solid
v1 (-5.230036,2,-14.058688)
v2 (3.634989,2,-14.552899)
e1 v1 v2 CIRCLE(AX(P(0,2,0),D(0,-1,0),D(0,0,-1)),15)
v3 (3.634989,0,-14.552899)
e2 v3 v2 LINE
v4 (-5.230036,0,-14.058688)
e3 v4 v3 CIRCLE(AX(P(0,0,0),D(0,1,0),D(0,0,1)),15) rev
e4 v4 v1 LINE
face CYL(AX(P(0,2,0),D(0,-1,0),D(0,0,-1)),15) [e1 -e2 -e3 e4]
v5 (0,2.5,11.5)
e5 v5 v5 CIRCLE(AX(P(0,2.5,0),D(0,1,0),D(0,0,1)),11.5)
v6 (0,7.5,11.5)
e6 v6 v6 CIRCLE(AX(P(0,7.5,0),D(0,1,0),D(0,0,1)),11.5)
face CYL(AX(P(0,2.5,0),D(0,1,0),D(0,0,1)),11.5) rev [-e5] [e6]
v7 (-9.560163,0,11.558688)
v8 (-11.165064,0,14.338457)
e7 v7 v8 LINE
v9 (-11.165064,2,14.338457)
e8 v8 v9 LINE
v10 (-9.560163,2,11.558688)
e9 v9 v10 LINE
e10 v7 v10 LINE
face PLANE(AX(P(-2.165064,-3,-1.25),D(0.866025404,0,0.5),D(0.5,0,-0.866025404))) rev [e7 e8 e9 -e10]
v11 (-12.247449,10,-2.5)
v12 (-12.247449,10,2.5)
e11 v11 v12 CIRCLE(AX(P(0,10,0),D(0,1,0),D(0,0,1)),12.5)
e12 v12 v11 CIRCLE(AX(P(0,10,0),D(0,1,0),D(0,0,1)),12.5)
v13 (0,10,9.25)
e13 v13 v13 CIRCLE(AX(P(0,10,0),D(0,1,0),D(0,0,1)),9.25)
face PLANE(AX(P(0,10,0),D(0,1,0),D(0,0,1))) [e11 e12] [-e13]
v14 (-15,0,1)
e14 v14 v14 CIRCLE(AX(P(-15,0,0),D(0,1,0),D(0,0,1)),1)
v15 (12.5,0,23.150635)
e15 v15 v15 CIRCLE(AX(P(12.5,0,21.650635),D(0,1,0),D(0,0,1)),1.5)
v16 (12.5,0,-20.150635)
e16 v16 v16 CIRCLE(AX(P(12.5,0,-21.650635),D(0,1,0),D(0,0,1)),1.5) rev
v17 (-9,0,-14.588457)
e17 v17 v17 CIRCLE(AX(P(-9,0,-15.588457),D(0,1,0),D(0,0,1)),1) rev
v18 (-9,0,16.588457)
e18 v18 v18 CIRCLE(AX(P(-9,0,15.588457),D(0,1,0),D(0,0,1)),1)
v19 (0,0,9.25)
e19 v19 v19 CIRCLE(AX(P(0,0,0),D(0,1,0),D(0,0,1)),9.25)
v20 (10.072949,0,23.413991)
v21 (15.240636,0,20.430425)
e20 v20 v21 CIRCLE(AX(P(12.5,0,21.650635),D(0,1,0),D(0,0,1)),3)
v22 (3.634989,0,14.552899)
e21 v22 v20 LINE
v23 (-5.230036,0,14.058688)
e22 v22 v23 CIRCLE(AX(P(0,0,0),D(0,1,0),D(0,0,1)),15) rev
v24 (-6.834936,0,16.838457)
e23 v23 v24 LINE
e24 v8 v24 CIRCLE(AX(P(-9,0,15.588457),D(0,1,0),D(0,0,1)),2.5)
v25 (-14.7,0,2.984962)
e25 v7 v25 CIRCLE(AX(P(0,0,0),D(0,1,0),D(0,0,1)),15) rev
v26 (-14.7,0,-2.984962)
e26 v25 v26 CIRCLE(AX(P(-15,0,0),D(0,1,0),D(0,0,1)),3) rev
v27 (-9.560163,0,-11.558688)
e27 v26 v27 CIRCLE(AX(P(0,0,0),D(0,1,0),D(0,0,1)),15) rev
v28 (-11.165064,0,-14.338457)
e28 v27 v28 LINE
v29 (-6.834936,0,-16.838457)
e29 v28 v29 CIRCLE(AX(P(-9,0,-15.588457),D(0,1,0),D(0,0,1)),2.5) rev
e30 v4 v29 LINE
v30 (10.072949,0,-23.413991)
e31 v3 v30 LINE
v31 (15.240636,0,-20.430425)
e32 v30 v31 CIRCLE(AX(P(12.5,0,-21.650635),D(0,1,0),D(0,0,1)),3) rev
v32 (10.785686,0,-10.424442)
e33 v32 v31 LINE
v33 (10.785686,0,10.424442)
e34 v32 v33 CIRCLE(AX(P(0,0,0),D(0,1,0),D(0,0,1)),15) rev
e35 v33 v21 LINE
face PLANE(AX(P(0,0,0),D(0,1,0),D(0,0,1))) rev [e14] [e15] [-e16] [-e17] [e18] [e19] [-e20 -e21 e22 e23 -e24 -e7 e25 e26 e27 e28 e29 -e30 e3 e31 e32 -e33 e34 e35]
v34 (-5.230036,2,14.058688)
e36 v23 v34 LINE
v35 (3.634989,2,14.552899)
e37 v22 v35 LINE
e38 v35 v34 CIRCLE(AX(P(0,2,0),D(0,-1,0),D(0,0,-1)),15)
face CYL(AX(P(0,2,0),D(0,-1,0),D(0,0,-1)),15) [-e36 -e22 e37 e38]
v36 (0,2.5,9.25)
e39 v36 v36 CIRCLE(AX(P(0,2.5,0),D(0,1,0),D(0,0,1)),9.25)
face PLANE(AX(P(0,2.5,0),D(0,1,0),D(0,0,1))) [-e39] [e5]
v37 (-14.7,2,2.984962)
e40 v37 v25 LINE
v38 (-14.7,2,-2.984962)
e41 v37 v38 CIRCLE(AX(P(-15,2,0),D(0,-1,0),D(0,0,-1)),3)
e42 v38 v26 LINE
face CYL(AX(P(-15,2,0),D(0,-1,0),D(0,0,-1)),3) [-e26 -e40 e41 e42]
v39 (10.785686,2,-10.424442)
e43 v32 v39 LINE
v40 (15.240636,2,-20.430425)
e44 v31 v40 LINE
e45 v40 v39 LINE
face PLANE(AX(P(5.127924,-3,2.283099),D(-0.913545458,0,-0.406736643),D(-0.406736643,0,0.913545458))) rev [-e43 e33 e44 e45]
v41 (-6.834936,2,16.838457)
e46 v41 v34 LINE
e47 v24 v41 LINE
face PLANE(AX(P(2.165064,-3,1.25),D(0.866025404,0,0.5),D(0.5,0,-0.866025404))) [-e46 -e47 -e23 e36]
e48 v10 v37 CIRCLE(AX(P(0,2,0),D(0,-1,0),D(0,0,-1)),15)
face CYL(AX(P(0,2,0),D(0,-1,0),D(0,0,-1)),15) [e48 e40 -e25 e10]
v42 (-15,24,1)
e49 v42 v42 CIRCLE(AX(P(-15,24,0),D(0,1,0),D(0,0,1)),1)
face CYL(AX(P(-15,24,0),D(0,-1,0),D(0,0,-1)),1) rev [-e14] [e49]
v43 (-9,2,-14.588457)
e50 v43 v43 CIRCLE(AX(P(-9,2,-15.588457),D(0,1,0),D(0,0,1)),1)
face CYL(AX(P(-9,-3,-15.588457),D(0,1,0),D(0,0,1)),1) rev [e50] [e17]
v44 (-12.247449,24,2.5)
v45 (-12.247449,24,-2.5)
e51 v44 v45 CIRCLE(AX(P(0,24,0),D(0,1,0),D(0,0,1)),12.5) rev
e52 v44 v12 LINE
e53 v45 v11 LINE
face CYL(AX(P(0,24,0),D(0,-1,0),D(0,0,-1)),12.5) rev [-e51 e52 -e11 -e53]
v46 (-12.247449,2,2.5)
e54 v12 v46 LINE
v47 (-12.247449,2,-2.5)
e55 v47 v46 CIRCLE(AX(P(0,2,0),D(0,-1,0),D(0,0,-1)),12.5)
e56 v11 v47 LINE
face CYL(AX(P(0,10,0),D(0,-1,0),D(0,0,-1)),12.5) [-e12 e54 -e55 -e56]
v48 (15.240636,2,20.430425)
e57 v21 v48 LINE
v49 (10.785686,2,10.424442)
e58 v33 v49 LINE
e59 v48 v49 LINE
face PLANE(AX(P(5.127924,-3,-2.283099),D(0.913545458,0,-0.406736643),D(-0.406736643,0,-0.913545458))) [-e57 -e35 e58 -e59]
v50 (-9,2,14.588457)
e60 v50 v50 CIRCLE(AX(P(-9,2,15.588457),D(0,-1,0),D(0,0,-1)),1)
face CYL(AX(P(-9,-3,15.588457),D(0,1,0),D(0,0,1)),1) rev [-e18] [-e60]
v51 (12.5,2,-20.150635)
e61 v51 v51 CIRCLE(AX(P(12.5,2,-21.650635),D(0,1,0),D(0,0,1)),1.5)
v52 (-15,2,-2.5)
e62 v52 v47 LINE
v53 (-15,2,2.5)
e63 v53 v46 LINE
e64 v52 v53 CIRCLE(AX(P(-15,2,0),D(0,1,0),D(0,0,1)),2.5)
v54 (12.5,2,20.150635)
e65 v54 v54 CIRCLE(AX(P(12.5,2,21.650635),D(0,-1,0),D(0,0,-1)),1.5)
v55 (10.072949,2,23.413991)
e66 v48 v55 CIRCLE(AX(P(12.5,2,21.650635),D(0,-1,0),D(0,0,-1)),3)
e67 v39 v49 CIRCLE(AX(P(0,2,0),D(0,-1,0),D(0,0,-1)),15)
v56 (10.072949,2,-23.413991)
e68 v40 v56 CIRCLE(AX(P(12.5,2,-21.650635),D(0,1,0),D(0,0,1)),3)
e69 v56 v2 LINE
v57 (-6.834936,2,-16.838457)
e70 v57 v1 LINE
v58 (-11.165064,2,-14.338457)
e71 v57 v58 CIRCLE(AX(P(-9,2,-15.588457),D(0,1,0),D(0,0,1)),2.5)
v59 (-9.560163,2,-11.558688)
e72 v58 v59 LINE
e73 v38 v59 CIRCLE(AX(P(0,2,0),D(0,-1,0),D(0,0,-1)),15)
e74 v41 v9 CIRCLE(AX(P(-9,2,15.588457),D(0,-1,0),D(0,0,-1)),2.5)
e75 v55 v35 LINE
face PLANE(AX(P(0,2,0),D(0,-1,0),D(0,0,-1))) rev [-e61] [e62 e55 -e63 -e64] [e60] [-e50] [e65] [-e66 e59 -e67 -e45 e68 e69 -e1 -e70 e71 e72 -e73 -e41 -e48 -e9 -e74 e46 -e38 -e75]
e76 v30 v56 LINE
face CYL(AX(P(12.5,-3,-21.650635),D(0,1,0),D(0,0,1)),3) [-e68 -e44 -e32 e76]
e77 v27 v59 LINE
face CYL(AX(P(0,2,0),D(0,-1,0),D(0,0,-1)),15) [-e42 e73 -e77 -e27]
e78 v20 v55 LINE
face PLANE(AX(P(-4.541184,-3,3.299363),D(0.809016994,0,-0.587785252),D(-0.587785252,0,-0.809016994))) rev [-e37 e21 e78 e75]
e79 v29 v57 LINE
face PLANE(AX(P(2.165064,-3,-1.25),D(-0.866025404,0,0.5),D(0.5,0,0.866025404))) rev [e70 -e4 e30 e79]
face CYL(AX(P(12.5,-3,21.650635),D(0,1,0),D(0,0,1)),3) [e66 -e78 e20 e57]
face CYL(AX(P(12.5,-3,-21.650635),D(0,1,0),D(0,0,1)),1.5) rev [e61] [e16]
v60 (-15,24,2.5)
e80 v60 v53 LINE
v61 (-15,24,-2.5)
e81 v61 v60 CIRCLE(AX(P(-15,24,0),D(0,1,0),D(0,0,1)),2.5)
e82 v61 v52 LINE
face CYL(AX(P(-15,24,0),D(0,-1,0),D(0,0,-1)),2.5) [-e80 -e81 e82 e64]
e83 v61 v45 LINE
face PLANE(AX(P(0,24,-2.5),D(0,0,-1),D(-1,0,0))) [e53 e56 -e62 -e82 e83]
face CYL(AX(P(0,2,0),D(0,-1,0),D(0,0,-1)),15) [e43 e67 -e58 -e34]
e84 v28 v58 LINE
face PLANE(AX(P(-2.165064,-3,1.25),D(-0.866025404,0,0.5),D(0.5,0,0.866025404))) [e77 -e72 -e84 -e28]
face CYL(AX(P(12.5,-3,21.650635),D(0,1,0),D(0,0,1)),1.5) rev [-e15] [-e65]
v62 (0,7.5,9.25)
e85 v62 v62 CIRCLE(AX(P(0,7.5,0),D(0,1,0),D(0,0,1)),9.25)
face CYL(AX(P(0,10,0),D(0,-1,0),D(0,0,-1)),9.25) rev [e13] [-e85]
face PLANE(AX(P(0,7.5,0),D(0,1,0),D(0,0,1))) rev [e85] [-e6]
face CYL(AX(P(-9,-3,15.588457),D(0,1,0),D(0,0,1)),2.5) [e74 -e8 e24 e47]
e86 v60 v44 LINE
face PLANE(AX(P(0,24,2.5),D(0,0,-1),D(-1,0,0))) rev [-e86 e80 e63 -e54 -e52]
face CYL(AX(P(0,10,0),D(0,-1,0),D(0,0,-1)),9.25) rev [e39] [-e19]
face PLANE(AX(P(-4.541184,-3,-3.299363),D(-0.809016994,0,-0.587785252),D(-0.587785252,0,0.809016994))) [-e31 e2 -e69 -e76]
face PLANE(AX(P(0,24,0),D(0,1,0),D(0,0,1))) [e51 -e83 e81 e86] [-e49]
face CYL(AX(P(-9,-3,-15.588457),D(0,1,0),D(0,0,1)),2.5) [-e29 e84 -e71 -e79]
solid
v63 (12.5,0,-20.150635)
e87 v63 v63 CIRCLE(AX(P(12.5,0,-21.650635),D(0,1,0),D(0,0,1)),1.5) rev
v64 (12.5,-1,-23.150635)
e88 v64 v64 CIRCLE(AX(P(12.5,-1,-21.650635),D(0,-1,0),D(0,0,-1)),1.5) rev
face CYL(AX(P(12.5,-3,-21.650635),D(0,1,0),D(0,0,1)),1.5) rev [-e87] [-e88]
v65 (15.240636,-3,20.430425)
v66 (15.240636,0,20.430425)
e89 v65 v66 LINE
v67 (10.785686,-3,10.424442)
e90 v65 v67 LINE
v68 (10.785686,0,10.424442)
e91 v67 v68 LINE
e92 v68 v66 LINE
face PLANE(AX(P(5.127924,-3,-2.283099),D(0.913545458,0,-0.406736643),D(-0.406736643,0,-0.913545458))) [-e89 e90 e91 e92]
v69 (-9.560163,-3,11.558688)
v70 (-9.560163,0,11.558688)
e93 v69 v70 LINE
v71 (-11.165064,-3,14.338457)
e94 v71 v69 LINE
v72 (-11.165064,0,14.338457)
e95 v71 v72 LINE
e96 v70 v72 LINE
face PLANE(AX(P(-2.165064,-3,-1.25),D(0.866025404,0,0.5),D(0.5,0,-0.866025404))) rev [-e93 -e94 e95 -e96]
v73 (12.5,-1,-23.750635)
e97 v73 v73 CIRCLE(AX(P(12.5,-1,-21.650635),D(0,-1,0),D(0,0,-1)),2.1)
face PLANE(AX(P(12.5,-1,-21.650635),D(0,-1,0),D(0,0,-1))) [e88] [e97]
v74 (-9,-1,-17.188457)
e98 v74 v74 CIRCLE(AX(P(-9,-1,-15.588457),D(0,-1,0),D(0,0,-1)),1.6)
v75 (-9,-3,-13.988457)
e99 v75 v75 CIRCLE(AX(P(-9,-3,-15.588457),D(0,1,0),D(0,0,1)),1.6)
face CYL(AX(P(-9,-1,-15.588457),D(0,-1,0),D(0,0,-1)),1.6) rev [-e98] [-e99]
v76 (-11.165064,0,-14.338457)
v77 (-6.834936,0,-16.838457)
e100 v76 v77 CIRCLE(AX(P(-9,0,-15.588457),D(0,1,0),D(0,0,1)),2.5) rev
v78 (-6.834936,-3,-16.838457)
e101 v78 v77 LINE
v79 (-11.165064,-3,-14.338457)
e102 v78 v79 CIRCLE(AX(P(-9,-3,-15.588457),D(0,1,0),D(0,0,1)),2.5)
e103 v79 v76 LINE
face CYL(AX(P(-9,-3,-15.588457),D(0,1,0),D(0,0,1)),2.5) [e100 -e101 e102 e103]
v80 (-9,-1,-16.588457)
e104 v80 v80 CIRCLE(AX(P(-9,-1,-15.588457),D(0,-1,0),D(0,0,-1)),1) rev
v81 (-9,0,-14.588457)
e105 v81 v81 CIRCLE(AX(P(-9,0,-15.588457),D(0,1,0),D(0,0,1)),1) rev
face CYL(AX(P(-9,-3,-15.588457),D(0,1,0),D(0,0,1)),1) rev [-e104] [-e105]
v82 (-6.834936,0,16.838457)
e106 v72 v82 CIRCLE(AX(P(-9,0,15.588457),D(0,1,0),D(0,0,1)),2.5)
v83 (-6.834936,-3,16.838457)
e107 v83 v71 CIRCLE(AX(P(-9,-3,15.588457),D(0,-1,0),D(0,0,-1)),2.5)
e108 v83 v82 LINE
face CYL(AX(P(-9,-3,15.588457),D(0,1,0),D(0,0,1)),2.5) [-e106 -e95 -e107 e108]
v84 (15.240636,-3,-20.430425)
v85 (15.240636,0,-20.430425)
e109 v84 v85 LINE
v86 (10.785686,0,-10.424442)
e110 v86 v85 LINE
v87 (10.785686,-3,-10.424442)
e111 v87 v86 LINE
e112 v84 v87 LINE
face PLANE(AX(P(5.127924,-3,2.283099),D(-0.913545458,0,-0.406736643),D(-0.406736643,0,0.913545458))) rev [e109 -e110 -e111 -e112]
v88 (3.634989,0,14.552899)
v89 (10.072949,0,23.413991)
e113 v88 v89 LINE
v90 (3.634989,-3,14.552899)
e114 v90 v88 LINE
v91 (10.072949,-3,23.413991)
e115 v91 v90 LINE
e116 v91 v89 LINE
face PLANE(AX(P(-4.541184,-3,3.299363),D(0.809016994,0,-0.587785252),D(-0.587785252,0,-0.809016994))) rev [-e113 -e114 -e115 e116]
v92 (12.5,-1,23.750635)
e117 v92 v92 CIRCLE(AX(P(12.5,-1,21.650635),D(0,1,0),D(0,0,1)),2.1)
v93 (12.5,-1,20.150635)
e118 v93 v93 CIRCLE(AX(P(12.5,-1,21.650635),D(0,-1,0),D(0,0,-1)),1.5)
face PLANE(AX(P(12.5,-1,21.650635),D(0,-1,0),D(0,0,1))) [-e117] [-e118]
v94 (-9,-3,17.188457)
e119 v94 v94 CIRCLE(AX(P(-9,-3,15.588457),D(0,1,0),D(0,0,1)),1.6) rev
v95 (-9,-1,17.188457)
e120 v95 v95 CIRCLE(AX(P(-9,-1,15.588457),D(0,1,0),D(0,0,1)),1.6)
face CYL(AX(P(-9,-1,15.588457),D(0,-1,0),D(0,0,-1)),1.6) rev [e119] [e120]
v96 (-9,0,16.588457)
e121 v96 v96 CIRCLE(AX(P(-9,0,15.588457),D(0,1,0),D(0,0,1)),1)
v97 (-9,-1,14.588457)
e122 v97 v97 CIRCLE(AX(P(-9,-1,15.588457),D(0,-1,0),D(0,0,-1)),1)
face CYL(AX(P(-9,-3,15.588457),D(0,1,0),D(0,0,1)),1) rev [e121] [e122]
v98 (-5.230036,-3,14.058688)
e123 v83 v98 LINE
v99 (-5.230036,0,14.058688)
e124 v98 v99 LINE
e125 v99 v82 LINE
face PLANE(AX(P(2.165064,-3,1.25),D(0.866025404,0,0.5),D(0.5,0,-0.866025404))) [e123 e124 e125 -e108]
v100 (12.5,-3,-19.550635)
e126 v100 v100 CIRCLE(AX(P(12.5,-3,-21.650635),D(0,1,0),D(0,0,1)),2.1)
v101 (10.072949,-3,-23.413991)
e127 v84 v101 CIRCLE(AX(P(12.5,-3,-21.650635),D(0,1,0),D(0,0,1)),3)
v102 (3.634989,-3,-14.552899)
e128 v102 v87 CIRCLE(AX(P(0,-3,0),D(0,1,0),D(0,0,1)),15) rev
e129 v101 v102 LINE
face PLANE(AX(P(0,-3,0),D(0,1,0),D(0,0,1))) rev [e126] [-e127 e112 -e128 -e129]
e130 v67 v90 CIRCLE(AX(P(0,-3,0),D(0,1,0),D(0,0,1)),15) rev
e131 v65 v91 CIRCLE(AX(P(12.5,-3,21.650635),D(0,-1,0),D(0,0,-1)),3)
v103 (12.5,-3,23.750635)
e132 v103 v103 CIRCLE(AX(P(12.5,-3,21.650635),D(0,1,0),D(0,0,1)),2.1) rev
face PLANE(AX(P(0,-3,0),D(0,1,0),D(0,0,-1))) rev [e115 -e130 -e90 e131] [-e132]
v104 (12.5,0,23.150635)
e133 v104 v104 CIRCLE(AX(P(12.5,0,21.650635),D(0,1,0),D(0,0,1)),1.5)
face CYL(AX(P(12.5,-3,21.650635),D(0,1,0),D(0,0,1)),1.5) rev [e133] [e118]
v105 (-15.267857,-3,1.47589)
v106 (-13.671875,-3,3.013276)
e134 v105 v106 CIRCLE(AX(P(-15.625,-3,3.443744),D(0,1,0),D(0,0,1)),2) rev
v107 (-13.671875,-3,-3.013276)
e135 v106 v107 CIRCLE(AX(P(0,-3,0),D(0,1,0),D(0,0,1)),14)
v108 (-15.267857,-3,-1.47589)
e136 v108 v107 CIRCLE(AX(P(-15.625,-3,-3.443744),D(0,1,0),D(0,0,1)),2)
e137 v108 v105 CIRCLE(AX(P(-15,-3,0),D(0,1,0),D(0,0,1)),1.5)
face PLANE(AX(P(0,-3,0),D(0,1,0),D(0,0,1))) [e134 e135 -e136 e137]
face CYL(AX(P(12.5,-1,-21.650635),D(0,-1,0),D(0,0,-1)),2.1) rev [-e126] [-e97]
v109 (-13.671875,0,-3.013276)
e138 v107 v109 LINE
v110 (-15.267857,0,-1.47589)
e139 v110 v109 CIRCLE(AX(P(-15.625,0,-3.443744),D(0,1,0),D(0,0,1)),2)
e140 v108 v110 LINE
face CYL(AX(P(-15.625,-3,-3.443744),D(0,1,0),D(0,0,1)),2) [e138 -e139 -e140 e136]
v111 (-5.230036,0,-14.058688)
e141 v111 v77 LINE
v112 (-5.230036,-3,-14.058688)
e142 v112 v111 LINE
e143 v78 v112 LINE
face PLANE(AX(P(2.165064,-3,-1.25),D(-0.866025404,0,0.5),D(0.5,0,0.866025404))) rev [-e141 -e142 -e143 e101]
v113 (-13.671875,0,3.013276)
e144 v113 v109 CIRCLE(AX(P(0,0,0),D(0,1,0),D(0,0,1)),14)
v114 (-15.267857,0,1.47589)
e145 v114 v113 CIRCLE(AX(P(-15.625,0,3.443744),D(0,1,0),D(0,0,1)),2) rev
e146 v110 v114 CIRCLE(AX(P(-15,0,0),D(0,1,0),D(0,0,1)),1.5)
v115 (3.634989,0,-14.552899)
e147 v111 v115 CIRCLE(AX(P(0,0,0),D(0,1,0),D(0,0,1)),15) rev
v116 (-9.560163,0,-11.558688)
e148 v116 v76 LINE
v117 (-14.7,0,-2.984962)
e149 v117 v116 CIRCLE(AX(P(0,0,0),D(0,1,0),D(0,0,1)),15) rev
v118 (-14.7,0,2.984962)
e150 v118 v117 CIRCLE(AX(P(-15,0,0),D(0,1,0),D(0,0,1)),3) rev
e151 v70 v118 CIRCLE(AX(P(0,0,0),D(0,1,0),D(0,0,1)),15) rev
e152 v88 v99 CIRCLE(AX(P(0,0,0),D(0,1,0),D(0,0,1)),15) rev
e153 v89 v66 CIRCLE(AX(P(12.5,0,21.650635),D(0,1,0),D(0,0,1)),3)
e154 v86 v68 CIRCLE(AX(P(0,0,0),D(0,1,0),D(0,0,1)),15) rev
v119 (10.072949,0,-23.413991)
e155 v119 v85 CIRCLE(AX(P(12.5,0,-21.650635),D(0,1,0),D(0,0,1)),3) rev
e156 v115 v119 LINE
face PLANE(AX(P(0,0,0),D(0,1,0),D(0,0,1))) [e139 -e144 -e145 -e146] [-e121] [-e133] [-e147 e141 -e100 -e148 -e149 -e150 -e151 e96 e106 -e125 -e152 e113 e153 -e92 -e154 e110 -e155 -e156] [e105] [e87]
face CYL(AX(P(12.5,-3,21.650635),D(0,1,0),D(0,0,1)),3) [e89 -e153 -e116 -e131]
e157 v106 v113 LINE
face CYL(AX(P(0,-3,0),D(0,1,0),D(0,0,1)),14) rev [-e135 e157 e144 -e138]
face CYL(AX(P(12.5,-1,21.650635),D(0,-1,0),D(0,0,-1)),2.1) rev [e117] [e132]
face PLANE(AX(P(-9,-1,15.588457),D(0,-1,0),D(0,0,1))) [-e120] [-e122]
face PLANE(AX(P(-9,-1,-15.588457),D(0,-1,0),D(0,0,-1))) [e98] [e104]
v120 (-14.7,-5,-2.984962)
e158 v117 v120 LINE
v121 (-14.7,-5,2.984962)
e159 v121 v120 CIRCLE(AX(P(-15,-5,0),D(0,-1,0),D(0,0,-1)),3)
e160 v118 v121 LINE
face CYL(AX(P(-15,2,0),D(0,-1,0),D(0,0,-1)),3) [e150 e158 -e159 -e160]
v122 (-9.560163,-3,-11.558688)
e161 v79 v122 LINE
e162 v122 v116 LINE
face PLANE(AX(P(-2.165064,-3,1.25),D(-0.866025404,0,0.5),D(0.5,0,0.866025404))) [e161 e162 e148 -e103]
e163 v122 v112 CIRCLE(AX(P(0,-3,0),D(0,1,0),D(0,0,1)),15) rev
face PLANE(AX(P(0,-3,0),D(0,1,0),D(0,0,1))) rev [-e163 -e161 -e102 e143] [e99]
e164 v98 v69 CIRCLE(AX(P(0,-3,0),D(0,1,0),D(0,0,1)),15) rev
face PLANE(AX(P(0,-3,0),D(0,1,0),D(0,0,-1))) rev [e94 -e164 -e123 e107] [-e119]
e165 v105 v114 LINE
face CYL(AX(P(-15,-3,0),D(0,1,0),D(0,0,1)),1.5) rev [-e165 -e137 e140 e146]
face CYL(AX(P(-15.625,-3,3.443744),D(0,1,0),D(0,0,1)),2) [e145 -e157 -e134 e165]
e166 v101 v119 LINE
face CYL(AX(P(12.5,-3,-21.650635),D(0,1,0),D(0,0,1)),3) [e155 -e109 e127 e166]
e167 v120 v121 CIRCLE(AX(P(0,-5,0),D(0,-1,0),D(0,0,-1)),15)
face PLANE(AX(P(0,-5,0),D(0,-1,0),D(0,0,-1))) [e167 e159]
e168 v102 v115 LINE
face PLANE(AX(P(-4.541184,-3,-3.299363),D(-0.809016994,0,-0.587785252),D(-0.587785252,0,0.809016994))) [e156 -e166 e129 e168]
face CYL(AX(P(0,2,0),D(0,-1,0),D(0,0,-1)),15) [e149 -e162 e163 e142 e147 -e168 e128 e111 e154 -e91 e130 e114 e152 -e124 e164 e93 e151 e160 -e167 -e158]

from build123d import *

# Parameters (mm, degrees)
SKETCH1_R                = 12.5
SKETCH1_R_2              = 9.25
BOSS_EXTRUDE1_DEPTH      = 10
CUT_EXTRUDE1_START       = -5
SKETCH2_R                = 11.5
SKETCH2_R_2              = 9.25
CUT_EXTRUDE1_DEPTH       = 5
BOSS_EXTRUDE2_DEPTH      = 5
BOSS_EXTRUDE2_DEPTH_BACK = 2
SKETCH4_R                = 1
BOSS_EXTRUDE4_DEPTH      = 22
CUT_EXTRUDE8_START       = -2
SKETCH4_3_R              = 1
CUT_EXTRUDE8_DEPTH       = 2
ARMS_START               = -3
SKETCH5_R                = 1
SKETCH5_R_2              = 1.5
ARMS_DEPTH               = 5
SKETCH7_R                = 1.6
SKETCH7_R_2              = 2.1
CUT_EXTRUDE4_DEPTH       = 4
CUT_EXTRUDE6_DEPTH       = 3
CUT_EXTRUDE7_START       = -2
SKETCH10_R               = 9.25
CUT_EXTRUDE7_DEPTH       = 2


with BuildPart() as part:
    # Sketch1 → Boss-Extrude1 (new body)
    with BuildSketch(Plane(origin=(0, 0, 0), x_dir=(1, 0, 0), z_dir=(0, 1, 0))):
        Circle(SKETCH1_R)
        Circle(SKETCH1_R_2, mode=Mode.SUBTRACT)
    extrude(amount=BOSS_EXTRUDE1_DEPTH)

    # Sketch2 → Cut-Extrude1 (cut)
    with BuildSketch(Plane(origin=(0, 7.5, 0), x_dir=(1, 0, 0), z_dir=(0, 1, 0)).offset(CUT_EXTRUDE1_START)):
        Circle(SKETCH2_R)
        Circle(SKETCH2_R_2, mode=Mode.SUBTRACT)
    extrude(amount=CUT_EXTRUDE1_DEPTH, mode=Mode.SUBTRACT)

    # Sketch3 → Boss-Extrude2 (add, two sides: drawn at the far end of the back side and taken through both)
    with BuildSketch(Plane.XZ.offset(-BOSS_EXTRUDE2_DEPTH_BACK)):
        with BuildLine():
            ThreePointArc((-14.7, 2.984962311), (-18, 0), (-14.7, -2.984962311))
            ThreePointArc((-14.7, -2.984962311), (15, 0), (-14.7, 2.984962311))
        make_face()
    extrude(amount=BOSS_EXTRUDE2_DEPTH + BOSS_EXTRUDE2_DEPTH_BACK)

    # Sketch4 → Boss-Extrude4 (add)
    with BuildSketch(Plane(origin=(0, 2, 0), x_dir=(1, 0, 0), z_dir=(0, 1, 0))):
        with BuildLine():
            Line((-12.247448714, 2.5), (-15, 2.5))
            ThreePointArc((-15, 2.5), (-17.5, 0), (-15, -2.5))
            Line((-15, -2.5), (-12.247448714, -2.5))
            ThreePointArc((-12.247448714, -2.5), (-12.5, 0), (-12.247448714, 2.5))
        make_face()
        with Locations((-15, 0)):
            Circle(SKETCH4_R, mode=Mode.SUBTRACT)
    extrude(amount=BOSS_EXTRUDE4_DEPTH)

    # Sketch4<3> → Cut-Extrude8 (cut)
    with BuildSketch(Plane(origin=(0, 2, 0), x_dir=(1, 0, 0), z_dir=(0, 1, 0)).offset(CUT_EXTRUDE8_START)):
        with Locations((-15, 0)):
            Circle(SKETCH4_3_R)
    extrude(amount=CUT_EXTRUDE8_DEPTH, mode=Mode.SUBTRACT)

    # Sketch5 → ARMS (add)
    # profile 1 of 2: a face of its own
    with BuildSketch(Plane(origin=(0, 0, 0), x_dir=(1, 0, 0), z_dir=(0, 1, 0)).offset(ARMS_START)):
        with BuildLine():
            Line((-3.958660847, 11.856601718), (-6.834936491, 16.838457268))
            ThreePointArc((-6.834936491, 16.838457268), (-10.25, 17.753520778), (-11.165063509, 14.338457268))
            Line((-11.165063509, 14.338457268), (-8.288787866, 9.356601718))
            ThreePointArc((-8.288787866, 9.356601718), (-6.25, 10.825317547), (-3.958660847, 11.856601718))
        make_face()
        with Locations((-9, 15.588457268)):
            Circle(SKETCH5_R, mode=Mode.SUBTRACT)
    # profile 2 of 2: a face of its own
    with BuildSketch(Plane(origin=(0, 0, 0), x_dir=(1, 0, 0), z_dir=(0, 1, 0)).offset(ARMS_START)):
        with BuildLine():
            Line((9.670679834, 7.92009795), (15.240636373, 20.430425165))
            ThreePointArc((15.240636373, 20.430425165), (14, 24.248711306), (10.072949017, 23.413990851))
            Line((10.072949017, 23.413990851), (2.023666108, 12.335103384))
            Line((2.023666108, 12.335103384), (9.670679834, 7.92009795))
        make_face()
        with Locations((12.5, 21.650635095)):
            Circle(SKETCH5_R_2, mode=Mode.SUBTRACT)
    arms = extrude(amount=ARMS_DEPTH)

    # Sketch7 → Cut-Extrude4 (cut)
    with BuildSketch(Plane.XZ.offset(5)):
        with Locations((-9, -15.588457268)):
            Circle(SKETCH7_R)
        with Locations((12.5, -21.650635095)):
            Circle(SKETCH7_R_2)
    cut_extrude4 = extrude(amount=-CUT_EXTRUDE4_DEPTH, mode=Mode.SUBTRACT)

    # Mirror1: ARMS, Cut-Extrude4 across plane
    add(arms.mirror(Plane.XY))
    add(cut_extrude4.mirror(Plane.XY), mode=Mode.SUBTRACT)

    # Sketch9 → Cut-Extrude6 (cut)
    with BuildSketch(Plane(origin=(0, 0, 0), x_dir=(1, 0, 0), z_dir=(0, 1, 0))):
        with BuildLine():
            ThreePointArc((-13.671875, -3.013276287), (14, 0), (-13.671875, 3.013276287))
            ThreePointArc((-13.671875, 3.013276287), (-14.237475869, 2.00333578), (-15.267857143, 1.475890426))
            ThreePointArc((-15.267857143, 1.475890426), (-16.5, 0), (-15.267857143, -1.475890426))
            ThreePointArc((-15.267857143, -1.475890426), (-14.237475869, -2.00333578), (-13.671875, -3.013276287))
        make_face()
    extrude(amount=-CUT_EXTRUDE6_DEPTH, mode=Mode.SUBTRACT)

    # Sketch10 → Cut-Extrude7 (cut)
    with BuildSketch(Plane(origin=(0, 2, 0), x_dir=(1, 0, 0), z_dir=(0, 1, 0)).offset(CUT_EXTRUDE7_START)):
        Circle(SKETCH10_R)
    extrude(amount=CUT_EXTRUDE7_DEPTH, mode=Mode.SUBTRACT)


with BuildPart() as body_2:
    # Split1: the piece on the far side of the plane
    add(part.part)
    split(bisect_by=Plane.ZX, keep=Keep.BOTTOM)


with BuildPart() as part_1:
    add(part.part)

    # Split1
    split(bisect_by=Plane.ZX, keep=Keep.TOP)


solid = Compound([body_2.part, part_1.part])
